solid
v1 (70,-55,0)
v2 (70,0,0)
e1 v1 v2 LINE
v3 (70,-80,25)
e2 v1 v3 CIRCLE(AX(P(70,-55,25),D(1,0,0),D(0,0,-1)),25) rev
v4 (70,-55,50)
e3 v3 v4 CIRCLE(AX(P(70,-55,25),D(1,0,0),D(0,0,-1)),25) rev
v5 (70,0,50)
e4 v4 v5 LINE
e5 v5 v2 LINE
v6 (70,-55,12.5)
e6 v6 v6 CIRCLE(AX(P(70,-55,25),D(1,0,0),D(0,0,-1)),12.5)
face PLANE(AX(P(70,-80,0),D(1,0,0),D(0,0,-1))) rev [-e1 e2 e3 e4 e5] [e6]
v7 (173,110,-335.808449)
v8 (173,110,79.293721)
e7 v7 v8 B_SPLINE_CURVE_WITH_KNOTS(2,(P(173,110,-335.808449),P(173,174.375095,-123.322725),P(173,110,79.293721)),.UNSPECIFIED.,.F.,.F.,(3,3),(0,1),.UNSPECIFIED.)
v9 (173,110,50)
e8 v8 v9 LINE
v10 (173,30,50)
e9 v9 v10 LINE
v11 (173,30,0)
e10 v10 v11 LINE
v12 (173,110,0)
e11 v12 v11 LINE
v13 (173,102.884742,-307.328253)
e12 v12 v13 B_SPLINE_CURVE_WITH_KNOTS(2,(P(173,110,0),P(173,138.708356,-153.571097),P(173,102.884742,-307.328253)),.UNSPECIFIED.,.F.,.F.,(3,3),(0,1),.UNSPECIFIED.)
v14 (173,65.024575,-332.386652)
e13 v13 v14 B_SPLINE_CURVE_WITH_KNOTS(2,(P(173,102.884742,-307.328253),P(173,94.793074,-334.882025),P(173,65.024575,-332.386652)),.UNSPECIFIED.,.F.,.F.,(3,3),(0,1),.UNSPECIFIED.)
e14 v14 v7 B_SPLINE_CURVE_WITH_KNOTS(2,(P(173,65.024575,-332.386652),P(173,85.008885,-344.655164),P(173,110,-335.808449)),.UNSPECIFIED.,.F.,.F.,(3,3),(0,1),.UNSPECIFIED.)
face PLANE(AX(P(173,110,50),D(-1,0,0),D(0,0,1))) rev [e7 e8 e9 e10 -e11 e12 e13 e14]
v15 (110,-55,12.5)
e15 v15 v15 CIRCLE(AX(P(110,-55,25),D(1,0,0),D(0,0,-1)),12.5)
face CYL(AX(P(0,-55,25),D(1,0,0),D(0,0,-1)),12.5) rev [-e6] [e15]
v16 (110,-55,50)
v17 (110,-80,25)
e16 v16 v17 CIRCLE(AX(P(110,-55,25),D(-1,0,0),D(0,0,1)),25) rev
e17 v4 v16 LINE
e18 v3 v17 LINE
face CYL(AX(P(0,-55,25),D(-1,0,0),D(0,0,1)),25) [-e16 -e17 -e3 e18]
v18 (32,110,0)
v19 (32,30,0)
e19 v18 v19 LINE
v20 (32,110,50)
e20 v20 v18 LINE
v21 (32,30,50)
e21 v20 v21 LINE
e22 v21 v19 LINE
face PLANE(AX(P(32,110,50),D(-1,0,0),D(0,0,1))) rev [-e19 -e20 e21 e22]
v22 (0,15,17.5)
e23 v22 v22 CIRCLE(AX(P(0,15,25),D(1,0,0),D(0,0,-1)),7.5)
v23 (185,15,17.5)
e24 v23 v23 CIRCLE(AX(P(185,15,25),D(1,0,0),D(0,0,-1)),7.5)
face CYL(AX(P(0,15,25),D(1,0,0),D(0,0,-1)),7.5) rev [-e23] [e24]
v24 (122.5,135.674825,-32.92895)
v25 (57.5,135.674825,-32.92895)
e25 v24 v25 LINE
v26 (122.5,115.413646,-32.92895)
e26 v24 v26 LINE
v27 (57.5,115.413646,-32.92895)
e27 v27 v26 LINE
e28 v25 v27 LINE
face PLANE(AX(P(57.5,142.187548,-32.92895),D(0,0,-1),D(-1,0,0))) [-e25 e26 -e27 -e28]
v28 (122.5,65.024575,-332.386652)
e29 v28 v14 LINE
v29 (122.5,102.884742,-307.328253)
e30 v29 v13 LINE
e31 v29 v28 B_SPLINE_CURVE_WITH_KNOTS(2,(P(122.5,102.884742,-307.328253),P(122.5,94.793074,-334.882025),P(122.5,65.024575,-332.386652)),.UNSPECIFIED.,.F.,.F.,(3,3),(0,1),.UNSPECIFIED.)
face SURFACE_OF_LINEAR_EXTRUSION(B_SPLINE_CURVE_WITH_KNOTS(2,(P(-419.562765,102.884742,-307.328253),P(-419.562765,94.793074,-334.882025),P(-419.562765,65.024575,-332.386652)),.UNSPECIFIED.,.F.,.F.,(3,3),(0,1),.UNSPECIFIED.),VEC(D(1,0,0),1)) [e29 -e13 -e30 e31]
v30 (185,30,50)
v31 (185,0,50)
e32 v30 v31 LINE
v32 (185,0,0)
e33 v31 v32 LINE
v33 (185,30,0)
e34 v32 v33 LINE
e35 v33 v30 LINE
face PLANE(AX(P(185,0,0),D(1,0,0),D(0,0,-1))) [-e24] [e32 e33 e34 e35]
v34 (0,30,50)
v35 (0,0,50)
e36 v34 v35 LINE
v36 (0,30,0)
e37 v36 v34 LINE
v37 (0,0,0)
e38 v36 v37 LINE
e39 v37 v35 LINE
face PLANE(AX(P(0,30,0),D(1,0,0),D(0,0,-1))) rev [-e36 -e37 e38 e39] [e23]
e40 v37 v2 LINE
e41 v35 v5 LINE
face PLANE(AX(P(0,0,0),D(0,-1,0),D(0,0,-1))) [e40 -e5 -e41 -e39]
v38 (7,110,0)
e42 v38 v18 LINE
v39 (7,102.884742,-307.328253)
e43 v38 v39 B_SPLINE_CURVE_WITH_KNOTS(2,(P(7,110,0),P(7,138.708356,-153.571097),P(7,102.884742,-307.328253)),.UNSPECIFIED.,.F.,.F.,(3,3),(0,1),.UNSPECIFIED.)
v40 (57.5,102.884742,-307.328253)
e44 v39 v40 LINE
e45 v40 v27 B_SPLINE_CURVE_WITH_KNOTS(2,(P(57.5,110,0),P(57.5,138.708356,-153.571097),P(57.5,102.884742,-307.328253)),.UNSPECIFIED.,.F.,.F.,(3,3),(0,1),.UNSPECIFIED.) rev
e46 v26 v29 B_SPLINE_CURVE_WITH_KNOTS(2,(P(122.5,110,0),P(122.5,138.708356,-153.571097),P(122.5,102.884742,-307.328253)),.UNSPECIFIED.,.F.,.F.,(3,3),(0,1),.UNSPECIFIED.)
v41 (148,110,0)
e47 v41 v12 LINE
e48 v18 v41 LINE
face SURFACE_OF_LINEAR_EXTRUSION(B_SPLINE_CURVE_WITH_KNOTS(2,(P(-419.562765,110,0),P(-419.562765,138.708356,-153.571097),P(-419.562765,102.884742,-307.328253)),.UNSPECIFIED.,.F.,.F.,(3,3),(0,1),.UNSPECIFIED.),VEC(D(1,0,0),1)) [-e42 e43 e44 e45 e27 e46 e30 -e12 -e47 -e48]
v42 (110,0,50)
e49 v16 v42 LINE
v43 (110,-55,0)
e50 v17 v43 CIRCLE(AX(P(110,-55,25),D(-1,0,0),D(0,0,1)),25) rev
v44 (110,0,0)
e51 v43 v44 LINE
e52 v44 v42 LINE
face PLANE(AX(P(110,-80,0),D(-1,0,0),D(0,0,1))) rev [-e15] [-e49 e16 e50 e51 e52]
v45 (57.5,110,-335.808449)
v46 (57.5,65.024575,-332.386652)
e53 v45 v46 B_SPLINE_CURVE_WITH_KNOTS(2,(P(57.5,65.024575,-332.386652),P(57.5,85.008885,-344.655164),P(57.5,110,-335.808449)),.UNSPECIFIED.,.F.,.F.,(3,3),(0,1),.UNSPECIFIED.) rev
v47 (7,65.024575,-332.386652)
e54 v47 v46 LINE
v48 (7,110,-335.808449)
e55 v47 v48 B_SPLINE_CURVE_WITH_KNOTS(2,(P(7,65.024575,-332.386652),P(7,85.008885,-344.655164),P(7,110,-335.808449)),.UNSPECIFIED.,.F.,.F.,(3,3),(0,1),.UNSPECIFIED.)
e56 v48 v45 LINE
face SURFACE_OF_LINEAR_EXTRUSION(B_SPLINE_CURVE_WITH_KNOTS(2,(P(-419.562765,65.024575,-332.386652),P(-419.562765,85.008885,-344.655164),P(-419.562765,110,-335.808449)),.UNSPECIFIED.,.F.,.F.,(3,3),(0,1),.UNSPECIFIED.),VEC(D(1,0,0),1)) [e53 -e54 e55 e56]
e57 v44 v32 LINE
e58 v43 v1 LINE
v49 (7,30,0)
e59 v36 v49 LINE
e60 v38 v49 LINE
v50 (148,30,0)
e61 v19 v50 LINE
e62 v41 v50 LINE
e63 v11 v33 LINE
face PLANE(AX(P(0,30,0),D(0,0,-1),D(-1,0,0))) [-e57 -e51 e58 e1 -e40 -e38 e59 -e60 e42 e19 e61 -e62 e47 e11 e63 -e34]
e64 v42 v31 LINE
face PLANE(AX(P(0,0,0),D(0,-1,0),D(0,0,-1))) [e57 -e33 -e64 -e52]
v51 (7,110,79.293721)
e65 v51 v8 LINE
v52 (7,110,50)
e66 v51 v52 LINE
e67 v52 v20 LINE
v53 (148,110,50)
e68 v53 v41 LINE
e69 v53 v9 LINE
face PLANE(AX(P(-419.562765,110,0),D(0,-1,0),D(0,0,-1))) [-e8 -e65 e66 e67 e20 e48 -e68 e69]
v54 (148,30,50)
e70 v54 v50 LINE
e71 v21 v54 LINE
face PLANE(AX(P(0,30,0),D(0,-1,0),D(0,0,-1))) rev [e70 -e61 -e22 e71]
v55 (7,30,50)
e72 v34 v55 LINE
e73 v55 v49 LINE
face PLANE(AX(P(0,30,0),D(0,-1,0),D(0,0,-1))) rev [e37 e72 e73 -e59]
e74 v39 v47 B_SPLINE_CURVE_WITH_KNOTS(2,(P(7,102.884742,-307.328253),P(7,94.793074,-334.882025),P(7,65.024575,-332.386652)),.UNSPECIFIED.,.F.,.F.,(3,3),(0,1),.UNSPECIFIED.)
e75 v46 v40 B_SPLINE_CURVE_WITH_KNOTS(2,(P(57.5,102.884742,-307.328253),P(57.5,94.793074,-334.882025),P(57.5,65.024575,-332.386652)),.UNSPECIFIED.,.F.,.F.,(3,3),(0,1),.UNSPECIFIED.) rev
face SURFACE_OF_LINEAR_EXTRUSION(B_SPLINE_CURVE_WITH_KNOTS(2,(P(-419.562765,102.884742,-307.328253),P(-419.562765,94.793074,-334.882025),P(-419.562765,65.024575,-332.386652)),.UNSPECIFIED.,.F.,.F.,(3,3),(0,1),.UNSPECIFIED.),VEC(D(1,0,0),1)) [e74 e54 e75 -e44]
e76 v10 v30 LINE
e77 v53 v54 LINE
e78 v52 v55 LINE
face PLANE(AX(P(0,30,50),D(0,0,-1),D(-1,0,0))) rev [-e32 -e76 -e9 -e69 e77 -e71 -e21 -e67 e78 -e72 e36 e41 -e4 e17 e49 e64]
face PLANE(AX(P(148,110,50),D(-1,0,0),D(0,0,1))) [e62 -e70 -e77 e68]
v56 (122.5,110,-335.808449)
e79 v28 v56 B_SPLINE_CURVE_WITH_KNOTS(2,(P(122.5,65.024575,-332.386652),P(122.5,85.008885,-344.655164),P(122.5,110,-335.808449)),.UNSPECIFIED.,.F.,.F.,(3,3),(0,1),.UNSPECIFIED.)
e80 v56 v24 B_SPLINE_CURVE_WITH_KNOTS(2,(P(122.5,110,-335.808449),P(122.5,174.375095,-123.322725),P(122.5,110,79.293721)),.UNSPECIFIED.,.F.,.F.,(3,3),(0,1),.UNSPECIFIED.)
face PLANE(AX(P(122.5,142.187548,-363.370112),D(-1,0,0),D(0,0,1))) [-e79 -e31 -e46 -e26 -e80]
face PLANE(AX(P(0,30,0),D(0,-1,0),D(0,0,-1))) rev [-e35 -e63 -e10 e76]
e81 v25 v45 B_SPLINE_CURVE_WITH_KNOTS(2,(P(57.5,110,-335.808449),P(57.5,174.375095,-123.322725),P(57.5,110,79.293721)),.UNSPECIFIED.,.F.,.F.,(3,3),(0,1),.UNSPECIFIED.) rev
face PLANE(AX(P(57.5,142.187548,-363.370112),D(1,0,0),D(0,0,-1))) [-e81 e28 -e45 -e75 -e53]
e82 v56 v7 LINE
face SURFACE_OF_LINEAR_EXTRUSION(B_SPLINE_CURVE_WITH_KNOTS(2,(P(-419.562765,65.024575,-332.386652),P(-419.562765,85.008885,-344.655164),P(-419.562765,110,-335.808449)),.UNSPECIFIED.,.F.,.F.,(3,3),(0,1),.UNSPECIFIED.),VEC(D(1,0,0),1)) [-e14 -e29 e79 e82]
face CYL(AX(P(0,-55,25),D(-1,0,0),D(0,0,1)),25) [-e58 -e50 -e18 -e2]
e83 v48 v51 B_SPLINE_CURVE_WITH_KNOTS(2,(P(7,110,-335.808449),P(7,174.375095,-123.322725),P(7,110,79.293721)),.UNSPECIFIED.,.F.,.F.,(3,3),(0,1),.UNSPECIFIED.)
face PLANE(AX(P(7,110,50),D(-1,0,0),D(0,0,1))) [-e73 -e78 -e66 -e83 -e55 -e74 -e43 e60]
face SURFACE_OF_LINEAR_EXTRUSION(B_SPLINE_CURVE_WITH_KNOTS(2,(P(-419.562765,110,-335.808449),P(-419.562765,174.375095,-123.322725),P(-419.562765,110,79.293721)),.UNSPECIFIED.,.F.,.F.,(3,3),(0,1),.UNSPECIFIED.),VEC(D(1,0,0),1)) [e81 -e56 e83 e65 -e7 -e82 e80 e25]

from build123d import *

# Parameters (mm, degrees)
SKETCH_1_W          = 180
SKETCH_1_H          = 50
EXTRUDE_1_DEPTH     = 30
SKETCH_2_W          = 40
SKETCH_2_H          = 50
EXTRUDE_2_DEPTH     = 80
FILLET_1_R          = 25
SKETCH_3_R          = 12.5
CUT_EXTRUDE_2_DEPTH = 145.913767462
SKETCH_7_W          = 25
SKETCH_7_H          = 50
EXTRUDE_5_DEPTH     = 80
EXTRUDE_6_REACH     = 213.019
SKETCH_9_W          = 65
SKETCH_9_H          = 330.441162185
CUT_EXTRUDE_4_DEPTH = 401.320460854
SKETCH_10_W         = 50
SKETCH_10_H         = 30
EXTRUDE_7_DEPTH     = 10
SKETCH_11_W         = 50
SKETCH_11_H         = 30
CUT_EXTRUDE_5_DEPTH = 5
SKETCH_12_R         = 7.5
CUT_EXTRUDE_6_DEPTH = 412.962042251


with BuildPart() as part:
    # 草图1 → 凸台-拉伸1 (new body)
    with BuildSketch(Plane(origin=(0, 0, 0), x_dir=(1, 0, 0), z_dir=(0, 1, 0))):
        with Locations((90, -25)):
            Rectangle(SKETCH_1_W, SKETCH_1_H)
    extrude(amount=EXTRUDE_1_DEPTH)

    # 草图2 → 凸台-拉伸2 (add)
    with BuildSketch(Plane.XZ):
        with Locations((90, 25)):
            Rectangle(SKETCH_2_W, SKETCH_2_H)
    extrude(amount=EXTRUDE_2_DEPTH)

    # 圆角1
    fillet_1_edges = [part.edges().sort_by_distance(p)[0] for p in [
        (90, -80, 50),
        (90, -80, 0),
    ]]
    fillet(fillet_1_edges, radius=FILLET_1_R - 0.0001)  # a hair under: the kernel refuses the full size

    # 草图3 → 切除-拉伸2 (cut, through all)
    with BuildSketch(Plane(origin=(110, 0, 0), x_dir=(0, 0, -1), z_dir=(1, 0, 0))):
        with Locations((-25, -55)):
            Circle(SKETCH_3_R)
    extrude(amount=-CUT_EXTRUDE_2_DEPTH, mode=Mode.SUBTRACT)

    # 草图7 → 凸台-拉伸5 (add)
    with BuildSketch(Plane(origin=(0, 30, 0), x_dir=(1, 0, 0), z_dir=(0, 1, 0))):
        with Locations((19.5, -25)):
            Rectangle(SKETCH_7_W, SKETCH_7_H)
        with Locations((160.5, -25)):
            Rectangle(SKETCH_7_W, SKETCH_7_H)
    extrude(amount=EXTRUDE_5_DEPTH)

    # 凸台-拉伸6: up to this face of the body (flat: up to its plane)
    extrude_6_end = Plane(part.part.faces().sort_by_distance((7, 70, 25))[0])
    # 草图8 → 凸台-拉伸6 (add, up to the picked face)
    with BuildSketch(Plane(origin=(173, 0, 0), x_dir=(0, 0, -1), z_dir=(1, 0, 0)), mode=Mode.PRIVATE) as extrude_6_sk1:
        with BuildLine():
            Line((0, 110), (-79.29372145, 110))
            add(Edge.make_bspline(
                [(-79.29372145, 110), (123.322725029, 174.375095478), (335.808448859, 110)],
                knots=[0, 0, 0, 1, 1, 1], degree=2))
            add(Edge.make_bspline(
                [(335.808448859, 110), (344.655163531, 85.008885119), (332.386652106, 65.024574676)],
                knots=[0, 0, 0, 1, 1, 1], degree=2))
            add(Edge.make_bspline(
                [(332.386652106, 65.024574676), (334.882025134, 94.793074398), (307.328252939, 102.88474179)],
                knots=[0, 0, 0, 1, 1, 1], degree=2))
            add(Edge.make_bspline(
                [(307.328252939, 102.88474179), (153.571097441, 138.708355764), (0, 110)],
                knots=[0, 0, 0, 1, 1, 1], degree=2))
        make_face()
    extrude_6_tool1 = split(extrude(extrude_6_sk1.sketch, amount=-EXTRUDE_6_REACH, mode=Mode.PRIVATE), bisect_by=extrude_6_end, keep=Keep.BOTH, mode=Mode.PRIVATE)
    add(extrude_6_tool1.solids().sort_by(Axis((173, 122.914419, -143.709252), (-1, 0, 0)))[0])

    # 草图9 → 切除-拉伸4 (cut, through all)
    with BuildSketch(Plane(origin=(0, 30, 0), x_dir=(1, 0, 0), z_dir=(0, 1, 0))):
        with Locations((90, 198.149530653)):
            Rectangle(SKETCH_9_W, SKETCH_9_H)
    extrude(amount=CUT_EXTRUDE_4_DEPTH, mode=Mode.SUBTRACT)

    # 草图10 → 凸台-拉伸7 (add)
    with BuildSketch(Plane(origin=(180, 0, 0), x_dir=(0, 0, -1), z_dir=(1, 0, 0))):
        with Locations((-25, 15)):
            Rectangle(SKETCH_10_W, SKETCH_10_H)
    extrude(amount=EXTRUDE_7_DEPTH)

    # 草图11 → 切除-拉伸5 (cut)
    with BuildSketch(Plane(origin=(190, 0, 0), x_dir=(0, 0, -1), z_dir=(1, 0, 0))):
        with Locations((-25, 15)):
            Rectangle(SKETCH_11_W, SKETCH_11_H)
    extrude(amount=-CUT_EXTRUDE_5_DEPTH, mode=Mode.SUBTRACT)

    # 草图12 → 切除-拉伸6 (cut, through all)
    with BuildSketch(Plane(origin=(185, 0, 0), x_dir=(0, 0, -1), z_dir=(1, 0, 0))):
        with Locations((-25, 15)):
            Circle(SKETCH_12_R)
    extrude(amount=-CUT_EXTRUDE_6_DEPTH, mode=Mode.SUBTRACT)


solid = part.part
